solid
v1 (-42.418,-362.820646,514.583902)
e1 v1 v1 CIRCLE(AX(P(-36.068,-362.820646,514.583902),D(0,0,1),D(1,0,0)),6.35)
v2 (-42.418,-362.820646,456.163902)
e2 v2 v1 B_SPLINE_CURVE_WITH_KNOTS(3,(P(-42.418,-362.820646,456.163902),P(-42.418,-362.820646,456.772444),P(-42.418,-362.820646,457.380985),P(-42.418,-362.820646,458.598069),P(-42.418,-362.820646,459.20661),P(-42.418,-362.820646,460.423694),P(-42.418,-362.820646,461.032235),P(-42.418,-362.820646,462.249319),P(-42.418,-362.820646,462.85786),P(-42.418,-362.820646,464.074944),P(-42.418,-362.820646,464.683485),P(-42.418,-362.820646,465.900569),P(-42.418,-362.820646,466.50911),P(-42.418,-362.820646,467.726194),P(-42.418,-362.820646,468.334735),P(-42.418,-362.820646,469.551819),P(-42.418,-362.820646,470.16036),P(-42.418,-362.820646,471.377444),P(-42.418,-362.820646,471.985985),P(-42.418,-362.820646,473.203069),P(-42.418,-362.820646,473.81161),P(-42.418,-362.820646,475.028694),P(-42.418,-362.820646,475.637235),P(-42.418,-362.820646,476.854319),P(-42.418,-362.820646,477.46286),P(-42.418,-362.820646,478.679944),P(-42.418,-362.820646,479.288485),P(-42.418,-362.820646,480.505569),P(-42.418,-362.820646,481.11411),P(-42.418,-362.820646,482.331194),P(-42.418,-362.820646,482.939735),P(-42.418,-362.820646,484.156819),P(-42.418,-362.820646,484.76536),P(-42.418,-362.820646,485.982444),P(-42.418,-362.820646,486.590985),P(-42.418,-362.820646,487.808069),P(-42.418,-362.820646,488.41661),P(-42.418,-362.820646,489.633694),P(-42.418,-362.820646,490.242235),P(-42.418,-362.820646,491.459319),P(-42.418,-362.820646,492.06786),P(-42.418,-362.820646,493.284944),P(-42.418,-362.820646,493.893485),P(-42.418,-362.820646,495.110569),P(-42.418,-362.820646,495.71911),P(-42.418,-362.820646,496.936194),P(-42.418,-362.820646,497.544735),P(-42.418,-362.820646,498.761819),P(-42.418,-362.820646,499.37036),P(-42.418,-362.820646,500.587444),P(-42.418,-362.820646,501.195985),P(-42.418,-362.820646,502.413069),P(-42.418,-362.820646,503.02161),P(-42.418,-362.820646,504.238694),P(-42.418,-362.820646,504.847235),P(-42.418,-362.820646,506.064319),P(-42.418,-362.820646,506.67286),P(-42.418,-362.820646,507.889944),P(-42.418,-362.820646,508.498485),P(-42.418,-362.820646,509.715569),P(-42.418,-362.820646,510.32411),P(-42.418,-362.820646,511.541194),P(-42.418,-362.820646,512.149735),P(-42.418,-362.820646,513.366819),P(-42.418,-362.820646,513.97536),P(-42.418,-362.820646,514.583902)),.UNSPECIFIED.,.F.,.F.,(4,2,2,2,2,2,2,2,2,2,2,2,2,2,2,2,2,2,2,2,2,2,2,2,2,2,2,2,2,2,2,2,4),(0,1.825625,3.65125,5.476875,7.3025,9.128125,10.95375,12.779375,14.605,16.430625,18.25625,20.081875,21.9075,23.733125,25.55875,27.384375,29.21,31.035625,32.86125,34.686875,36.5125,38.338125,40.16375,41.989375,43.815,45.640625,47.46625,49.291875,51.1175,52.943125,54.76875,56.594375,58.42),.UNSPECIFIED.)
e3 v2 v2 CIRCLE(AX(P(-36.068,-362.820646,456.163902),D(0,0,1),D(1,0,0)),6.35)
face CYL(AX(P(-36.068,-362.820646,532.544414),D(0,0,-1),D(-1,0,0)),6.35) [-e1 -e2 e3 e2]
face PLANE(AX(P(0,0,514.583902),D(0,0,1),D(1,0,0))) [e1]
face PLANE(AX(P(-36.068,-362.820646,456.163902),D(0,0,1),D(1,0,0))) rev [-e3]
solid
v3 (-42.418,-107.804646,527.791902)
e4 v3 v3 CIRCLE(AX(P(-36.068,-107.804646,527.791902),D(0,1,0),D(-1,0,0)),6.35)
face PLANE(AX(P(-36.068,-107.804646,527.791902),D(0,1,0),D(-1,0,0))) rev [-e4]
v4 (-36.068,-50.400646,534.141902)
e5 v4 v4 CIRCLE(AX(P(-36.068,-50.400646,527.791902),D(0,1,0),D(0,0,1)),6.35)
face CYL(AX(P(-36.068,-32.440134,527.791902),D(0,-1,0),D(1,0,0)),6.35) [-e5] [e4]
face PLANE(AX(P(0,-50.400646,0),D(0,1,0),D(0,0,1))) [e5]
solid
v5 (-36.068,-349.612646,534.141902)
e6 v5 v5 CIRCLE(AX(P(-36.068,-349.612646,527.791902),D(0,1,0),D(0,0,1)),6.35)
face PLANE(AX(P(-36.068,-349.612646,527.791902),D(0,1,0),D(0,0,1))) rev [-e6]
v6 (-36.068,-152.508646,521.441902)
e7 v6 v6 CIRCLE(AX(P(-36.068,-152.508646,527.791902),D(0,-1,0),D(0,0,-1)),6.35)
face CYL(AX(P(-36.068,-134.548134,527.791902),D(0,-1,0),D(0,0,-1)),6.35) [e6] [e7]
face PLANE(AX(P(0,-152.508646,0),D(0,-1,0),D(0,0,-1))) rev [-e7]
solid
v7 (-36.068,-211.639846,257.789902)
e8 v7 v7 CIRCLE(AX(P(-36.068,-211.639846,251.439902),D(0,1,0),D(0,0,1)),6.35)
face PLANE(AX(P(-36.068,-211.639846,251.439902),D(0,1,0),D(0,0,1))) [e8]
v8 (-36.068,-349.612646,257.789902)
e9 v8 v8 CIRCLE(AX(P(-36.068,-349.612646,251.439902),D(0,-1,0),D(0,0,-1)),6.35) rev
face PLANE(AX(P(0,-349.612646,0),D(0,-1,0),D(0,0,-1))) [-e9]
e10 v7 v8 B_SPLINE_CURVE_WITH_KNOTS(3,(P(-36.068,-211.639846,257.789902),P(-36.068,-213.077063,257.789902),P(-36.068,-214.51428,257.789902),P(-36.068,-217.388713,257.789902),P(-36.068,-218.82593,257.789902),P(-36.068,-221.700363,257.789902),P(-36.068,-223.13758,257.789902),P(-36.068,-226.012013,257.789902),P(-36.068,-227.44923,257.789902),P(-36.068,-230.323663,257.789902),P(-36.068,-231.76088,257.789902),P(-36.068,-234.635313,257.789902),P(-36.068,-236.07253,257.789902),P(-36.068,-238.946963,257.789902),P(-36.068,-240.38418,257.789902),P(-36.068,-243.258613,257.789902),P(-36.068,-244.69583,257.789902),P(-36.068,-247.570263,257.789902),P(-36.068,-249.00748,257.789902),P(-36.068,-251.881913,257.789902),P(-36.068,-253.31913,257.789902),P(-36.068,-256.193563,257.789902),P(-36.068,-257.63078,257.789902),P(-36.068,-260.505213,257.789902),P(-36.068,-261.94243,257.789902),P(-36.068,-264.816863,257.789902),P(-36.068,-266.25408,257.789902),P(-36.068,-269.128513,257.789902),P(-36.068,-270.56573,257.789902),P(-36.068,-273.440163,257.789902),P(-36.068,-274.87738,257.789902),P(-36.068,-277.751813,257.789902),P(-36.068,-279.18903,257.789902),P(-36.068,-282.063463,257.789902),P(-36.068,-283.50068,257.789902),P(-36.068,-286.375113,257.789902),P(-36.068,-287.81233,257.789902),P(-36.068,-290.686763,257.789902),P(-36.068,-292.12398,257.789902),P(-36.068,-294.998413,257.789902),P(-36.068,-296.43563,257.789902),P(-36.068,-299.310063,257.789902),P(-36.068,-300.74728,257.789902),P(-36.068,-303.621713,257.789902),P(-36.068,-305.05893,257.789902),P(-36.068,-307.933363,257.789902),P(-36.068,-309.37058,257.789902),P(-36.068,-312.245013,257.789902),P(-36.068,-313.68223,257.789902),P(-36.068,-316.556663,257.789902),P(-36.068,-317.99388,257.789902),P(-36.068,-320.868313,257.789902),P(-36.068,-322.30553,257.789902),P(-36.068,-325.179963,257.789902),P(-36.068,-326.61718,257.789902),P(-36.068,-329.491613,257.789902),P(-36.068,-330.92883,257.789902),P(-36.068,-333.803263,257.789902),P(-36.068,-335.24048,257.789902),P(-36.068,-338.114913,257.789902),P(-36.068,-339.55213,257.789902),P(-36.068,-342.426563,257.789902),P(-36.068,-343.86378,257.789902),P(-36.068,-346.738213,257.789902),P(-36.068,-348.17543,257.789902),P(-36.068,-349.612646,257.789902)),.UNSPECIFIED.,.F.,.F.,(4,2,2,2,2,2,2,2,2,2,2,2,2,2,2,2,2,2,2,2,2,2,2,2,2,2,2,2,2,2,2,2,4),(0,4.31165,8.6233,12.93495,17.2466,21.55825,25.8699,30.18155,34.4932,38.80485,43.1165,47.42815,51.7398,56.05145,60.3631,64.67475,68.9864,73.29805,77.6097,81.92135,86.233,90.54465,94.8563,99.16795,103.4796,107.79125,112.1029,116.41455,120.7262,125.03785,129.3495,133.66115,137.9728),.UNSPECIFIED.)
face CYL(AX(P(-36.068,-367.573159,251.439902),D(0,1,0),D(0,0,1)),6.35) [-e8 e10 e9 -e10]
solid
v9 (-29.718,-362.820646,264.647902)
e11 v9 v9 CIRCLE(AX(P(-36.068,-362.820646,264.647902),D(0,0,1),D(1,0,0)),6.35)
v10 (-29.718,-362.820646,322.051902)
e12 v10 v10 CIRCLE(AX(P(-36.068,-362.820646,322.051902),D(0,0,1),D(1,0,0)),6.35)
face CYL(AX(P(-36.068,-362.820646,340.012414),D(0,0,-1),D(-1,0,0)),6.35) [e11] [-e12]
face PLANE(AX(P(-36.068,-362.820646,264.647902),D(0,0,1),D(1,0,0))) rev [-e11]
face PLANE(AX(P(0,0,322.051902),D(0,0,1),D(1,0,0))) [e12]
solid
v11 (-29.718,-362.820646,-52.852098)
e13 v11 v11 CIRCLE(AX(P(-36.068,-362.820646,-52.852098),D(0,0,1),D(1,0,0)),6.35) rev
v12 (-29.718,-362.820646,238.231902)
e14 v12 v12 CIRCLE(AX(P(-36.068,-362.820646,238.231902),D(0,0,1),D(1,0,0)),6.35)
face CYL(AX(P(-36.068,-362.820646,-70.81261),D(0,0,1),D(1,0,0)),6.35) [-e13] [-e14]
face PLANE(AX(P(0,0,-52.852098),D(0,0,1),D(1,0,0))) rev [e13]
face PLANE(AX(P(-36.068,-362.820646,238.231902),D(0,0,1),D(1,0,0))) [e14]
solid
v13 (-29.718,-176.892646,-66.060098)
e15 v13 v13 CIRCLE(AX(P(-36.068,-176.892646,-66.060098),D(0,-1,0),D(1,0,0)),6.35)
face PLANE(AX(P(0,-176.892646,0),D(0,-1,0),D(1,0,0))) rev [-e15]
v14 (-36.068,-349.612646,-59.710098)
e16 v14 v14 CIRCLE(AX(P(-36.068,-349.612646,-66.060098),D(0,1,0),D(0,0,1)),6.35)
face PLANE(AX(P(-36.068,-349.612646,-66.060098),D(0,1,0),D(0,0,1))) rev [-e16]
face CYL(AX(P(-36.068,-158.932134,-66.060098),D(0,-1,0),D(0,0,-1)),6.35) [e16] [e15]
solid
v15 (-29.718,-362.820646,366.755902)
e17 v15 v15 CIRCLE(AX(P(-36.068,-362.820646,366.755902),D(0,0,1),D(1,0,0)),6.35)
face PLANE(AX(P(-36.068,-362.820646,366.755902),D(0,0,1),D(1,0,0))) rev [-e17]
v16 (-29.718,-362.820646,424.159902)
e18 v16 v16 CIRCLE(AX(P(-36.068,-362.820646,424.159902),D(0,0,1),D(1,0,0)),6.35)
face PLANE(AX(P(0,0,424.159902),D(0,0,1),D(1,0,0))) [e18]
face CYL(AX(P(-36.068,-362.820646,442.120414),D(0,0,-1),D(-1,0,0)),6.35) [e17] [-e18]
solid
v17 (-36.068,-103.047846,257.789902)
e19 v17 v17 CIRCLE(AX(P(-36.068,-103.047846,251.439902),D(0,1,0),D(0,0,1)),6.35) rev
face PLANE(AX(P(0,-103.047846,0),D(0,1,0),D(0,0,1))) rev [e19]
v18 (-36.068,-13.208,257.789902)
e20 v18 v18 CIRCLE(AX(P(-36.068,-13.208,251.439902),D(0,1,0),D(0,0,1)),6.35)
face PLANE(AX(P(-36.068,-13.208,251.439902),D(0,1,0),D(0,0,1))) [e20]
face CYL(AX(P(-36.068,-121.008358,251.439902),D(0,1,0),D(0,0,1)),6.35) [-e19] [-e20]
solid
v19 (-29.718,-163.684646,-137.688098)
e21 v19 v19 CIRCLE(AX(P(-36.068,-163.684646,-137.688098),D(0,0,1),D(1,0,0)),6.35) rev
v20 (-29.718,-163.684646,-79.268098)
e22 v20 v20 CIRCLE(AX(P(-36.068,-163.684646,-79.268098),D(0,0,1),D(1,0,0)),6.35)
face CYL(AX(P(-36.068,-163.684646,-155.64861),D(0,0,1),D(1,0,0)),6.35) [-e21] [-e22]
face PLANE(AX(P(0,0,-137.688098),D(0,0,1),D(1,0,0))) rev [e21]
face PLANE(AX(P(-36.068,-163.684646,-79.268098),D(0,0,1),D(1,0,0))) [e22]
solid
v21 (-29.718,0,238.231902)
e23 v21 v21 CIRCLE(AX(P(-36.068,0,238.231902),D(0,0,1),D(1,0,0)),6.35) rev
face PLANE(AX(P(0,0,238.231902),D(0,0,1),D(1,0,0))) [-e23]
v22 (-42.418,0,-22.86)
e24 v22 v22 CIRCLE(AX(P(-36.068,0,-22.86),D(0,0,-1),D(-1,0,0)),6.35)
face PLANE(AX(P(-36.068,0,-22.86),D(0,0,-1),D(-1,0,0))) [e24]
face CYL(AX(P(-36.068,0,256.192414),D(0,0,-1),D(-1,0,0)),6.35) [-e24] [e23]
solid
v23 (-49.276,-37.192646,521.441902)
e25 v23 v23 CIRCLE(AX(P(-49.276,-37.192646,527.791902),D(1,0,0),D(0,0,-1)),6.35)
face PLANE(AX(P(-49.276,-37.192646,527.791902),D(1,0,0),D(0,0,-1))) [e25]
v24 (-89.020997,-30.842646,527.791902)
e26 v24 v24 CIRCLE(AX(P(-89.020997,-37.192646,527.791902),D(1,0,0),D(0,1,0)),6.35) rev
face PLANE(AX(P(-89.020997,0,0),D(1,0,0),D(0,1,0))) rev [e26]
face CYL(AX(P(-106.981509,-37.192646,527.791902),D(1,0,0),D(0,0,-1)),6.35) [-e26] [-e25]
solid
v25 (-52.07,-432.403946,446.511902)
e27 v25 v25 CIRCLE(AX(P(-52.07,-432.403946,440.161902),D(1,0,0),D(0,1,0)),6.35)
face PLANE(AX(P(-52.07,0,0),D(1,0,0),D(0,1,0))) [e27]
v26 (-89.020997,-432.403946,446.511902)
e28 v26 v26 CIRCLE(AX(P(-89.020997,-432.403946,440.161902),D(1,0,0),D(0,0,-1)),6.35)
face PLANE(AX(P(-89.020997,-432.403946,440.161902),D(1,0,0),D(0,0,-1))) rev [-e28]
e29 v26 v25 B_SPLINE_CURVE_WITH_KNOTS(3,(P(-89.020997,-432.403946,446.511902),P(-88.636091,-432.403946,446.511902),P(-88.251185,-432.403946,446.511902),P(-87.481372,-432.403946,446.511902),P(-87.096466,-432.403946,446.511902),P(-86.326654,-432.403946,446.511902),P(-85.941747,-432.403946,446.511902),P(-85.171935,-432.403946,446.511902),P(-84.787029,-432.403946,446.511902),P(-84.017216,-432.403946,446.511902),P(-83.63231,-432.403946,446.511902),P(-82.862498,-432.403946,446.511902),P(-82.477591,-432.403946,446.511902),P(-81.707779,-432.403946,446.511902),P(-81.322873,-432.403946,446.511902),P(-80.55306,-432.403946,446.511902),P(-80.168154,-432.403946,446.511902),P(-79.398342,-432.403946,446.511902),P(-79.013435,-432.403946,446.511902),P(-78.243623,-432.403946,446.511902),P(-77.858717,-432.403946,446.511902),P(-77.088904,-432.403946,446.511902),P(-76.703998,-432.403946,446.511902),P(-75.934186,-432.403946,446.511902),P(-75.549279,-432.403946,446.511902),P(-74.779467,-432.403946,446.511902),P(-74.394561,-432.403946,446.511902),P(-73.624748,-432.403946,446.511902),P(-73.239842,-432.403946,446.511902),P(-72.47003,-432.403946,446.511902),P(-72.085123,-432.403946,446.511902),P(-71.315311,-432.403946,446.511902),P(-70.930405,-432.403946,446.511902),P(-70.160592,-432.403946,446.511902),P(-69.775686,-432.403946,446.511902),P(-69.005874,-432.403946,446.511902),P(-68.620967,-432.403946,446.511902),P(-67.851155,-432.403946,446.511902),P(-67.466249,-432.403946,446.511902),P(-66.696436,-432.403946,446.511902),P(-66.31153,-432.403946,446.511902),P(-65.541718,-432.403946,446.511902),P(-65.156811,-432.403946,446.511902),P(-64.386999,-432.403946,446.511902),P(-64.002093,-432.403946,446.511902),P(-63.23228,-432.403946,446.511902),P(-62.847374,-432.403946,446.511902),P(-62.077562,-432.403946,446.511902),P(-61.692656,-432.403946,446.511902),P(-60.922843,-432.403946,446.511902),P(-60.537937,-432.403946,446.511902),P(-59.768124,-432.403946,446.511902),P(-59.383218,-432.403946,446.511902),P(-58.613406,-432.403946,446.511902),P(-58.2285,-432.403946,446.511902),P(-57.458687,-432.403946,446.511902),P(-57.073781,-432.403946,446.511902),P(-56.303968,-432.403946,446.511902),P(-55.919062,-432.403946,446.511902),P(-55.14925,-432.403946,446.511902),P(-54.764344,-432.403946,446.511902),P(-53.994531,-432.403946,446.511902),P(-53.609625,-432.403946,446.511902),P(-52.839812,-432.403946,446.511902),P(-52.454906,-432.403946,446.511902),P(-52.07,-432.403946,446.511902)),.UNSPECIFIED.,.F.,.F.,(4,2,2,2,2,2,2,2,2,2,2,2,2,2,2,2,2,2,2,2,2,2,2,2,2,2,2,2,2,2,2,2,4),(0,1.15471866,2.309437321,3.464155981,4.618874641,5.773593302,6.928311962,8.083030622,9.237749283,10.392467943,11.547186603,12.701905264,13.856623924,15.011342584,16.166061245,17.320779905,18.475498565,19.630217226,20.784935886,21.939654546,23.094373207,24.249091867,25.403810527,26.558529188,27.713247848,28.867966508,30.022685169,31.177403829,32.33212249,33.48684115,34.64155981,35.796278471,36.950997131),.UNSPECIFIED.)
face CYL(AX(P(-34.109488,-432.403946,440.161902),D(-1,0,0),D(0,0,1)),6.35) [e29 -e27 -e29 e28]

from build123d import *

# Parameters (mm, degrees)
BOSS_EXTRUDE1_START     = -261.091901869
BOSS_EXTRUDE1_OUTLINE_R = 6.35
BOSS_EXTRUDE1_DEPTH     = 261.091901869
SKETCH3_R               = 6.35
BOSS_EXTRUDE2_DEPTH     = 89.839846195
SKETCH4_R               = 6.35
BOSS_EXTRUDE3_DEPTH     = 137.9728
SKETCH5_R               = 6.35
BOSS_EXTRUDE4_DEPTH     = 291.084
SKETCH6_R               = 6.35
BOSS_EXTRUDE5_DEPTH     = 172.720000001
SKETCH7_R               = 6.35
BOSS_EXTRUDE6_DEPTH     = 58.42
SKETCH8_R               = 6.35
BOSS_EXTRUDE7_DEPTH     = 57.404
SKETCH9_R               = 6.35
BOSS_EXTRUDE8_DEPTH     = 57.404
SKETCH10_R              = 6.35
BOSS_EXTRUDE9_DEPTH     = 36.950997131
SKETCH11_R              = 6.35
BOSS_EXTRUDE10_DEPTH    = 58.42
SKETCH12_R              = 6.35
BOSS_EXTRUDE11_DEPTH    = 197.104
SKETCH13_R              = 6.35
BOSS_EXTRUDE12_DEPTH    = 57.404
SKETCH14_R              = 6.35
BOSS_EXTRUDE13_DEPTH    = 39.744997131


# Read off the part's stored shape, not the designer's step: Boss-Extrude1
with BuildPart() as part:
    # Boss-Extrude1 outline → Boss-Extrude1 (new body)
    with BuildSketch(Plane(origin=(0, 0, -22.86), x_dir=(-1, 0, 0), z_dir=(0, 0, -1)).offset(BOSS_EXTRUDE1_START)):
        with Locations((36.068, 0)):
            Circle(BOSS_EXTRUDE1_OUTLINE_R)
    extrude(amount=BOSS_EXTRUDE1_DEPTH)


with BuildPart() as body_2:
    # Sketch3 → Boss-Extrude2 (new body)
    with BuildSketch(Plane(origin=(0, -13.208, 0), x_dir=(1, 0, 0), z_dir=(0, 1, 0))):
        with Locations(Location((-36.068, -251.439901869, 0), (0, 0, 270))):
            Circle(SKETCH3_R)
    extrude(amount=-BOSS_EXTRUDE2_DEPTH)


with BuildPart() as body_3:
    # Sketch4 → Boss-Extrude3 (new body)
    with BuildSketch(Plane(origin=(0, -211.639846435, 0), x_dir=(1, 0, 0), z_dir=(0, 1, 0))):
        with Locations(Location((-36.068, -251.439901869, 0), (0, 0, 270))):
            Circle(SKETCH4_R)
    extrude(amount=-BOSS_EXTRUDE3_DEPTH)


with BuildPart() as body_4:
    # Sketch5 → Boss-Extrude4 (new body)
    with BuildSketch(Plane.XY.offset(238.231901869)):
        with Locations((-36.068, -362.820646437)):
            Circle(SKETCH5_R)
    extrude(amount=-BOSS_EXTRUDE4_DEPTH)


with BuildPart() as body_5:
    # Sketch6 → Boss-Extrude5 (new body)
    with BuildSketch(Plane(origin=(0, -349.612646437, 0), x_dir=(1, 0, 0), z_dir=(0, 1, 0))):
        with Locations((-36.068, 66.060098131)):
            Circle(SKETCH6_R)
    extrude(amount=BOSS_EXTRUDE5_DEPTH)


with BuildPart() as body_6:
    # Sketch7 → Boss-Extrude6 (new body)
    with BuildSketch(Plane.XY.offset(-79.268098131)):
        with Locations((-36.068, -163.684646435)):
            Circle(SKETCH7_R)
    extrude(amount=-BOSS_EXTRUDE6_DEPTH)


with BuildPart() as body_7:
    # Sketch8 → Boss-Extrude7 (new body)
    with BuildSketch(Plane.XY.offset(264.647901869)):
        with Locations((-36.068, -362.820646435)):
            Circle(SKETCH8_R)
    extrude(amount=BOSS_EXTRUDE7_DEPTH)


with BuildPart() as body_8:
    # Sketch9 → Boss-Extrude8 (new body)
    with BuildSketch(Plane.XY.offset(366.755901869)):
        with Locations((-36.068, -362.820646437)):
            Circle(SKETCH9_R)
    extrude(amount=BOSS_EXTRUDE8_DEPTH)


with BuildPart() as body_9:
    # Sketch10 → Boss-Extrude9 (new body)
    with BuildSketch(Plane(origin=(-89.020997131, 0, 0), x_dir=(0, 0, -1), z_dir=(1, 0, 0))):
        with Locations(Location((-440.161901869, -432.403946437, 0), (0, 0, 180))):
            Circle(SKETCH10_R)
    extrude(amount=BOSS_EXTRUDE9_DEPTH)


with BuildPart() as body_10:
    # Sketch11 → Boss-Extrude10 (new body)
    with BuildSketch(Plane.XY.offset(456.163901869)):
        with Locations(Location((-36.068, -362.820646437, 0), (0, 0, 180))):
            Circle(SKETCH11_R)
    extrude(amount=BOSS_EXTRUDE10_DEPTH)


with BuildPart() as body_11:
    # Sketch12 → Boss-Extrude11 (new body)
    with BuildSketch(Plane(origin=(0, -349.612646437, 0), x_dir=(1, 0, 0), z_dir=(0, 1, 0))):
        with Locations(Location((-36.068, -527.791901869, 0), (0, 0, 90))):
            Circle(SKETCH12_R)
    extrude(amount=BOSS_EXTRUDE11_DEPTH)


with BuildPart() as body_12:
    # Sketch13 → Boss-Extrude12 (new body)
    with BuildSketch(Plane(origin=(0, -107.804646437, 0), x_dir=(1, 0, 0), z_dir=(0, 1, 0))):
        with Locations(Location((-36.068, -527.791901869, 0), (0, 0, 270))):
            Circle(SKETCH13_R)
    extrude(amount=BOSS_EXTRUDE12_DEPTH)


with BuildPart() as body_13:
    # Sketch14 → Boss-Extrude13 (new body)
    with BuildSketch(Plane(origin=(-49.276, 0, 0), x_dir=(0, 0, -1), z_dir=(1, 0, 0))):
        with Locations((-527.791901869, -37.192646437)):
            Circle(SKETCH14_R)
    extrude(amount=-BOSS_EXTRUDE13_DEPTH)


solid = Compound([part.part, body_2.part, body_3.part, body_4.part, body_5.part, body_6.part, body_7.part, body_8.part, body_9.part, body_10.part, body_11.part, body_12.part, body_13.part])
